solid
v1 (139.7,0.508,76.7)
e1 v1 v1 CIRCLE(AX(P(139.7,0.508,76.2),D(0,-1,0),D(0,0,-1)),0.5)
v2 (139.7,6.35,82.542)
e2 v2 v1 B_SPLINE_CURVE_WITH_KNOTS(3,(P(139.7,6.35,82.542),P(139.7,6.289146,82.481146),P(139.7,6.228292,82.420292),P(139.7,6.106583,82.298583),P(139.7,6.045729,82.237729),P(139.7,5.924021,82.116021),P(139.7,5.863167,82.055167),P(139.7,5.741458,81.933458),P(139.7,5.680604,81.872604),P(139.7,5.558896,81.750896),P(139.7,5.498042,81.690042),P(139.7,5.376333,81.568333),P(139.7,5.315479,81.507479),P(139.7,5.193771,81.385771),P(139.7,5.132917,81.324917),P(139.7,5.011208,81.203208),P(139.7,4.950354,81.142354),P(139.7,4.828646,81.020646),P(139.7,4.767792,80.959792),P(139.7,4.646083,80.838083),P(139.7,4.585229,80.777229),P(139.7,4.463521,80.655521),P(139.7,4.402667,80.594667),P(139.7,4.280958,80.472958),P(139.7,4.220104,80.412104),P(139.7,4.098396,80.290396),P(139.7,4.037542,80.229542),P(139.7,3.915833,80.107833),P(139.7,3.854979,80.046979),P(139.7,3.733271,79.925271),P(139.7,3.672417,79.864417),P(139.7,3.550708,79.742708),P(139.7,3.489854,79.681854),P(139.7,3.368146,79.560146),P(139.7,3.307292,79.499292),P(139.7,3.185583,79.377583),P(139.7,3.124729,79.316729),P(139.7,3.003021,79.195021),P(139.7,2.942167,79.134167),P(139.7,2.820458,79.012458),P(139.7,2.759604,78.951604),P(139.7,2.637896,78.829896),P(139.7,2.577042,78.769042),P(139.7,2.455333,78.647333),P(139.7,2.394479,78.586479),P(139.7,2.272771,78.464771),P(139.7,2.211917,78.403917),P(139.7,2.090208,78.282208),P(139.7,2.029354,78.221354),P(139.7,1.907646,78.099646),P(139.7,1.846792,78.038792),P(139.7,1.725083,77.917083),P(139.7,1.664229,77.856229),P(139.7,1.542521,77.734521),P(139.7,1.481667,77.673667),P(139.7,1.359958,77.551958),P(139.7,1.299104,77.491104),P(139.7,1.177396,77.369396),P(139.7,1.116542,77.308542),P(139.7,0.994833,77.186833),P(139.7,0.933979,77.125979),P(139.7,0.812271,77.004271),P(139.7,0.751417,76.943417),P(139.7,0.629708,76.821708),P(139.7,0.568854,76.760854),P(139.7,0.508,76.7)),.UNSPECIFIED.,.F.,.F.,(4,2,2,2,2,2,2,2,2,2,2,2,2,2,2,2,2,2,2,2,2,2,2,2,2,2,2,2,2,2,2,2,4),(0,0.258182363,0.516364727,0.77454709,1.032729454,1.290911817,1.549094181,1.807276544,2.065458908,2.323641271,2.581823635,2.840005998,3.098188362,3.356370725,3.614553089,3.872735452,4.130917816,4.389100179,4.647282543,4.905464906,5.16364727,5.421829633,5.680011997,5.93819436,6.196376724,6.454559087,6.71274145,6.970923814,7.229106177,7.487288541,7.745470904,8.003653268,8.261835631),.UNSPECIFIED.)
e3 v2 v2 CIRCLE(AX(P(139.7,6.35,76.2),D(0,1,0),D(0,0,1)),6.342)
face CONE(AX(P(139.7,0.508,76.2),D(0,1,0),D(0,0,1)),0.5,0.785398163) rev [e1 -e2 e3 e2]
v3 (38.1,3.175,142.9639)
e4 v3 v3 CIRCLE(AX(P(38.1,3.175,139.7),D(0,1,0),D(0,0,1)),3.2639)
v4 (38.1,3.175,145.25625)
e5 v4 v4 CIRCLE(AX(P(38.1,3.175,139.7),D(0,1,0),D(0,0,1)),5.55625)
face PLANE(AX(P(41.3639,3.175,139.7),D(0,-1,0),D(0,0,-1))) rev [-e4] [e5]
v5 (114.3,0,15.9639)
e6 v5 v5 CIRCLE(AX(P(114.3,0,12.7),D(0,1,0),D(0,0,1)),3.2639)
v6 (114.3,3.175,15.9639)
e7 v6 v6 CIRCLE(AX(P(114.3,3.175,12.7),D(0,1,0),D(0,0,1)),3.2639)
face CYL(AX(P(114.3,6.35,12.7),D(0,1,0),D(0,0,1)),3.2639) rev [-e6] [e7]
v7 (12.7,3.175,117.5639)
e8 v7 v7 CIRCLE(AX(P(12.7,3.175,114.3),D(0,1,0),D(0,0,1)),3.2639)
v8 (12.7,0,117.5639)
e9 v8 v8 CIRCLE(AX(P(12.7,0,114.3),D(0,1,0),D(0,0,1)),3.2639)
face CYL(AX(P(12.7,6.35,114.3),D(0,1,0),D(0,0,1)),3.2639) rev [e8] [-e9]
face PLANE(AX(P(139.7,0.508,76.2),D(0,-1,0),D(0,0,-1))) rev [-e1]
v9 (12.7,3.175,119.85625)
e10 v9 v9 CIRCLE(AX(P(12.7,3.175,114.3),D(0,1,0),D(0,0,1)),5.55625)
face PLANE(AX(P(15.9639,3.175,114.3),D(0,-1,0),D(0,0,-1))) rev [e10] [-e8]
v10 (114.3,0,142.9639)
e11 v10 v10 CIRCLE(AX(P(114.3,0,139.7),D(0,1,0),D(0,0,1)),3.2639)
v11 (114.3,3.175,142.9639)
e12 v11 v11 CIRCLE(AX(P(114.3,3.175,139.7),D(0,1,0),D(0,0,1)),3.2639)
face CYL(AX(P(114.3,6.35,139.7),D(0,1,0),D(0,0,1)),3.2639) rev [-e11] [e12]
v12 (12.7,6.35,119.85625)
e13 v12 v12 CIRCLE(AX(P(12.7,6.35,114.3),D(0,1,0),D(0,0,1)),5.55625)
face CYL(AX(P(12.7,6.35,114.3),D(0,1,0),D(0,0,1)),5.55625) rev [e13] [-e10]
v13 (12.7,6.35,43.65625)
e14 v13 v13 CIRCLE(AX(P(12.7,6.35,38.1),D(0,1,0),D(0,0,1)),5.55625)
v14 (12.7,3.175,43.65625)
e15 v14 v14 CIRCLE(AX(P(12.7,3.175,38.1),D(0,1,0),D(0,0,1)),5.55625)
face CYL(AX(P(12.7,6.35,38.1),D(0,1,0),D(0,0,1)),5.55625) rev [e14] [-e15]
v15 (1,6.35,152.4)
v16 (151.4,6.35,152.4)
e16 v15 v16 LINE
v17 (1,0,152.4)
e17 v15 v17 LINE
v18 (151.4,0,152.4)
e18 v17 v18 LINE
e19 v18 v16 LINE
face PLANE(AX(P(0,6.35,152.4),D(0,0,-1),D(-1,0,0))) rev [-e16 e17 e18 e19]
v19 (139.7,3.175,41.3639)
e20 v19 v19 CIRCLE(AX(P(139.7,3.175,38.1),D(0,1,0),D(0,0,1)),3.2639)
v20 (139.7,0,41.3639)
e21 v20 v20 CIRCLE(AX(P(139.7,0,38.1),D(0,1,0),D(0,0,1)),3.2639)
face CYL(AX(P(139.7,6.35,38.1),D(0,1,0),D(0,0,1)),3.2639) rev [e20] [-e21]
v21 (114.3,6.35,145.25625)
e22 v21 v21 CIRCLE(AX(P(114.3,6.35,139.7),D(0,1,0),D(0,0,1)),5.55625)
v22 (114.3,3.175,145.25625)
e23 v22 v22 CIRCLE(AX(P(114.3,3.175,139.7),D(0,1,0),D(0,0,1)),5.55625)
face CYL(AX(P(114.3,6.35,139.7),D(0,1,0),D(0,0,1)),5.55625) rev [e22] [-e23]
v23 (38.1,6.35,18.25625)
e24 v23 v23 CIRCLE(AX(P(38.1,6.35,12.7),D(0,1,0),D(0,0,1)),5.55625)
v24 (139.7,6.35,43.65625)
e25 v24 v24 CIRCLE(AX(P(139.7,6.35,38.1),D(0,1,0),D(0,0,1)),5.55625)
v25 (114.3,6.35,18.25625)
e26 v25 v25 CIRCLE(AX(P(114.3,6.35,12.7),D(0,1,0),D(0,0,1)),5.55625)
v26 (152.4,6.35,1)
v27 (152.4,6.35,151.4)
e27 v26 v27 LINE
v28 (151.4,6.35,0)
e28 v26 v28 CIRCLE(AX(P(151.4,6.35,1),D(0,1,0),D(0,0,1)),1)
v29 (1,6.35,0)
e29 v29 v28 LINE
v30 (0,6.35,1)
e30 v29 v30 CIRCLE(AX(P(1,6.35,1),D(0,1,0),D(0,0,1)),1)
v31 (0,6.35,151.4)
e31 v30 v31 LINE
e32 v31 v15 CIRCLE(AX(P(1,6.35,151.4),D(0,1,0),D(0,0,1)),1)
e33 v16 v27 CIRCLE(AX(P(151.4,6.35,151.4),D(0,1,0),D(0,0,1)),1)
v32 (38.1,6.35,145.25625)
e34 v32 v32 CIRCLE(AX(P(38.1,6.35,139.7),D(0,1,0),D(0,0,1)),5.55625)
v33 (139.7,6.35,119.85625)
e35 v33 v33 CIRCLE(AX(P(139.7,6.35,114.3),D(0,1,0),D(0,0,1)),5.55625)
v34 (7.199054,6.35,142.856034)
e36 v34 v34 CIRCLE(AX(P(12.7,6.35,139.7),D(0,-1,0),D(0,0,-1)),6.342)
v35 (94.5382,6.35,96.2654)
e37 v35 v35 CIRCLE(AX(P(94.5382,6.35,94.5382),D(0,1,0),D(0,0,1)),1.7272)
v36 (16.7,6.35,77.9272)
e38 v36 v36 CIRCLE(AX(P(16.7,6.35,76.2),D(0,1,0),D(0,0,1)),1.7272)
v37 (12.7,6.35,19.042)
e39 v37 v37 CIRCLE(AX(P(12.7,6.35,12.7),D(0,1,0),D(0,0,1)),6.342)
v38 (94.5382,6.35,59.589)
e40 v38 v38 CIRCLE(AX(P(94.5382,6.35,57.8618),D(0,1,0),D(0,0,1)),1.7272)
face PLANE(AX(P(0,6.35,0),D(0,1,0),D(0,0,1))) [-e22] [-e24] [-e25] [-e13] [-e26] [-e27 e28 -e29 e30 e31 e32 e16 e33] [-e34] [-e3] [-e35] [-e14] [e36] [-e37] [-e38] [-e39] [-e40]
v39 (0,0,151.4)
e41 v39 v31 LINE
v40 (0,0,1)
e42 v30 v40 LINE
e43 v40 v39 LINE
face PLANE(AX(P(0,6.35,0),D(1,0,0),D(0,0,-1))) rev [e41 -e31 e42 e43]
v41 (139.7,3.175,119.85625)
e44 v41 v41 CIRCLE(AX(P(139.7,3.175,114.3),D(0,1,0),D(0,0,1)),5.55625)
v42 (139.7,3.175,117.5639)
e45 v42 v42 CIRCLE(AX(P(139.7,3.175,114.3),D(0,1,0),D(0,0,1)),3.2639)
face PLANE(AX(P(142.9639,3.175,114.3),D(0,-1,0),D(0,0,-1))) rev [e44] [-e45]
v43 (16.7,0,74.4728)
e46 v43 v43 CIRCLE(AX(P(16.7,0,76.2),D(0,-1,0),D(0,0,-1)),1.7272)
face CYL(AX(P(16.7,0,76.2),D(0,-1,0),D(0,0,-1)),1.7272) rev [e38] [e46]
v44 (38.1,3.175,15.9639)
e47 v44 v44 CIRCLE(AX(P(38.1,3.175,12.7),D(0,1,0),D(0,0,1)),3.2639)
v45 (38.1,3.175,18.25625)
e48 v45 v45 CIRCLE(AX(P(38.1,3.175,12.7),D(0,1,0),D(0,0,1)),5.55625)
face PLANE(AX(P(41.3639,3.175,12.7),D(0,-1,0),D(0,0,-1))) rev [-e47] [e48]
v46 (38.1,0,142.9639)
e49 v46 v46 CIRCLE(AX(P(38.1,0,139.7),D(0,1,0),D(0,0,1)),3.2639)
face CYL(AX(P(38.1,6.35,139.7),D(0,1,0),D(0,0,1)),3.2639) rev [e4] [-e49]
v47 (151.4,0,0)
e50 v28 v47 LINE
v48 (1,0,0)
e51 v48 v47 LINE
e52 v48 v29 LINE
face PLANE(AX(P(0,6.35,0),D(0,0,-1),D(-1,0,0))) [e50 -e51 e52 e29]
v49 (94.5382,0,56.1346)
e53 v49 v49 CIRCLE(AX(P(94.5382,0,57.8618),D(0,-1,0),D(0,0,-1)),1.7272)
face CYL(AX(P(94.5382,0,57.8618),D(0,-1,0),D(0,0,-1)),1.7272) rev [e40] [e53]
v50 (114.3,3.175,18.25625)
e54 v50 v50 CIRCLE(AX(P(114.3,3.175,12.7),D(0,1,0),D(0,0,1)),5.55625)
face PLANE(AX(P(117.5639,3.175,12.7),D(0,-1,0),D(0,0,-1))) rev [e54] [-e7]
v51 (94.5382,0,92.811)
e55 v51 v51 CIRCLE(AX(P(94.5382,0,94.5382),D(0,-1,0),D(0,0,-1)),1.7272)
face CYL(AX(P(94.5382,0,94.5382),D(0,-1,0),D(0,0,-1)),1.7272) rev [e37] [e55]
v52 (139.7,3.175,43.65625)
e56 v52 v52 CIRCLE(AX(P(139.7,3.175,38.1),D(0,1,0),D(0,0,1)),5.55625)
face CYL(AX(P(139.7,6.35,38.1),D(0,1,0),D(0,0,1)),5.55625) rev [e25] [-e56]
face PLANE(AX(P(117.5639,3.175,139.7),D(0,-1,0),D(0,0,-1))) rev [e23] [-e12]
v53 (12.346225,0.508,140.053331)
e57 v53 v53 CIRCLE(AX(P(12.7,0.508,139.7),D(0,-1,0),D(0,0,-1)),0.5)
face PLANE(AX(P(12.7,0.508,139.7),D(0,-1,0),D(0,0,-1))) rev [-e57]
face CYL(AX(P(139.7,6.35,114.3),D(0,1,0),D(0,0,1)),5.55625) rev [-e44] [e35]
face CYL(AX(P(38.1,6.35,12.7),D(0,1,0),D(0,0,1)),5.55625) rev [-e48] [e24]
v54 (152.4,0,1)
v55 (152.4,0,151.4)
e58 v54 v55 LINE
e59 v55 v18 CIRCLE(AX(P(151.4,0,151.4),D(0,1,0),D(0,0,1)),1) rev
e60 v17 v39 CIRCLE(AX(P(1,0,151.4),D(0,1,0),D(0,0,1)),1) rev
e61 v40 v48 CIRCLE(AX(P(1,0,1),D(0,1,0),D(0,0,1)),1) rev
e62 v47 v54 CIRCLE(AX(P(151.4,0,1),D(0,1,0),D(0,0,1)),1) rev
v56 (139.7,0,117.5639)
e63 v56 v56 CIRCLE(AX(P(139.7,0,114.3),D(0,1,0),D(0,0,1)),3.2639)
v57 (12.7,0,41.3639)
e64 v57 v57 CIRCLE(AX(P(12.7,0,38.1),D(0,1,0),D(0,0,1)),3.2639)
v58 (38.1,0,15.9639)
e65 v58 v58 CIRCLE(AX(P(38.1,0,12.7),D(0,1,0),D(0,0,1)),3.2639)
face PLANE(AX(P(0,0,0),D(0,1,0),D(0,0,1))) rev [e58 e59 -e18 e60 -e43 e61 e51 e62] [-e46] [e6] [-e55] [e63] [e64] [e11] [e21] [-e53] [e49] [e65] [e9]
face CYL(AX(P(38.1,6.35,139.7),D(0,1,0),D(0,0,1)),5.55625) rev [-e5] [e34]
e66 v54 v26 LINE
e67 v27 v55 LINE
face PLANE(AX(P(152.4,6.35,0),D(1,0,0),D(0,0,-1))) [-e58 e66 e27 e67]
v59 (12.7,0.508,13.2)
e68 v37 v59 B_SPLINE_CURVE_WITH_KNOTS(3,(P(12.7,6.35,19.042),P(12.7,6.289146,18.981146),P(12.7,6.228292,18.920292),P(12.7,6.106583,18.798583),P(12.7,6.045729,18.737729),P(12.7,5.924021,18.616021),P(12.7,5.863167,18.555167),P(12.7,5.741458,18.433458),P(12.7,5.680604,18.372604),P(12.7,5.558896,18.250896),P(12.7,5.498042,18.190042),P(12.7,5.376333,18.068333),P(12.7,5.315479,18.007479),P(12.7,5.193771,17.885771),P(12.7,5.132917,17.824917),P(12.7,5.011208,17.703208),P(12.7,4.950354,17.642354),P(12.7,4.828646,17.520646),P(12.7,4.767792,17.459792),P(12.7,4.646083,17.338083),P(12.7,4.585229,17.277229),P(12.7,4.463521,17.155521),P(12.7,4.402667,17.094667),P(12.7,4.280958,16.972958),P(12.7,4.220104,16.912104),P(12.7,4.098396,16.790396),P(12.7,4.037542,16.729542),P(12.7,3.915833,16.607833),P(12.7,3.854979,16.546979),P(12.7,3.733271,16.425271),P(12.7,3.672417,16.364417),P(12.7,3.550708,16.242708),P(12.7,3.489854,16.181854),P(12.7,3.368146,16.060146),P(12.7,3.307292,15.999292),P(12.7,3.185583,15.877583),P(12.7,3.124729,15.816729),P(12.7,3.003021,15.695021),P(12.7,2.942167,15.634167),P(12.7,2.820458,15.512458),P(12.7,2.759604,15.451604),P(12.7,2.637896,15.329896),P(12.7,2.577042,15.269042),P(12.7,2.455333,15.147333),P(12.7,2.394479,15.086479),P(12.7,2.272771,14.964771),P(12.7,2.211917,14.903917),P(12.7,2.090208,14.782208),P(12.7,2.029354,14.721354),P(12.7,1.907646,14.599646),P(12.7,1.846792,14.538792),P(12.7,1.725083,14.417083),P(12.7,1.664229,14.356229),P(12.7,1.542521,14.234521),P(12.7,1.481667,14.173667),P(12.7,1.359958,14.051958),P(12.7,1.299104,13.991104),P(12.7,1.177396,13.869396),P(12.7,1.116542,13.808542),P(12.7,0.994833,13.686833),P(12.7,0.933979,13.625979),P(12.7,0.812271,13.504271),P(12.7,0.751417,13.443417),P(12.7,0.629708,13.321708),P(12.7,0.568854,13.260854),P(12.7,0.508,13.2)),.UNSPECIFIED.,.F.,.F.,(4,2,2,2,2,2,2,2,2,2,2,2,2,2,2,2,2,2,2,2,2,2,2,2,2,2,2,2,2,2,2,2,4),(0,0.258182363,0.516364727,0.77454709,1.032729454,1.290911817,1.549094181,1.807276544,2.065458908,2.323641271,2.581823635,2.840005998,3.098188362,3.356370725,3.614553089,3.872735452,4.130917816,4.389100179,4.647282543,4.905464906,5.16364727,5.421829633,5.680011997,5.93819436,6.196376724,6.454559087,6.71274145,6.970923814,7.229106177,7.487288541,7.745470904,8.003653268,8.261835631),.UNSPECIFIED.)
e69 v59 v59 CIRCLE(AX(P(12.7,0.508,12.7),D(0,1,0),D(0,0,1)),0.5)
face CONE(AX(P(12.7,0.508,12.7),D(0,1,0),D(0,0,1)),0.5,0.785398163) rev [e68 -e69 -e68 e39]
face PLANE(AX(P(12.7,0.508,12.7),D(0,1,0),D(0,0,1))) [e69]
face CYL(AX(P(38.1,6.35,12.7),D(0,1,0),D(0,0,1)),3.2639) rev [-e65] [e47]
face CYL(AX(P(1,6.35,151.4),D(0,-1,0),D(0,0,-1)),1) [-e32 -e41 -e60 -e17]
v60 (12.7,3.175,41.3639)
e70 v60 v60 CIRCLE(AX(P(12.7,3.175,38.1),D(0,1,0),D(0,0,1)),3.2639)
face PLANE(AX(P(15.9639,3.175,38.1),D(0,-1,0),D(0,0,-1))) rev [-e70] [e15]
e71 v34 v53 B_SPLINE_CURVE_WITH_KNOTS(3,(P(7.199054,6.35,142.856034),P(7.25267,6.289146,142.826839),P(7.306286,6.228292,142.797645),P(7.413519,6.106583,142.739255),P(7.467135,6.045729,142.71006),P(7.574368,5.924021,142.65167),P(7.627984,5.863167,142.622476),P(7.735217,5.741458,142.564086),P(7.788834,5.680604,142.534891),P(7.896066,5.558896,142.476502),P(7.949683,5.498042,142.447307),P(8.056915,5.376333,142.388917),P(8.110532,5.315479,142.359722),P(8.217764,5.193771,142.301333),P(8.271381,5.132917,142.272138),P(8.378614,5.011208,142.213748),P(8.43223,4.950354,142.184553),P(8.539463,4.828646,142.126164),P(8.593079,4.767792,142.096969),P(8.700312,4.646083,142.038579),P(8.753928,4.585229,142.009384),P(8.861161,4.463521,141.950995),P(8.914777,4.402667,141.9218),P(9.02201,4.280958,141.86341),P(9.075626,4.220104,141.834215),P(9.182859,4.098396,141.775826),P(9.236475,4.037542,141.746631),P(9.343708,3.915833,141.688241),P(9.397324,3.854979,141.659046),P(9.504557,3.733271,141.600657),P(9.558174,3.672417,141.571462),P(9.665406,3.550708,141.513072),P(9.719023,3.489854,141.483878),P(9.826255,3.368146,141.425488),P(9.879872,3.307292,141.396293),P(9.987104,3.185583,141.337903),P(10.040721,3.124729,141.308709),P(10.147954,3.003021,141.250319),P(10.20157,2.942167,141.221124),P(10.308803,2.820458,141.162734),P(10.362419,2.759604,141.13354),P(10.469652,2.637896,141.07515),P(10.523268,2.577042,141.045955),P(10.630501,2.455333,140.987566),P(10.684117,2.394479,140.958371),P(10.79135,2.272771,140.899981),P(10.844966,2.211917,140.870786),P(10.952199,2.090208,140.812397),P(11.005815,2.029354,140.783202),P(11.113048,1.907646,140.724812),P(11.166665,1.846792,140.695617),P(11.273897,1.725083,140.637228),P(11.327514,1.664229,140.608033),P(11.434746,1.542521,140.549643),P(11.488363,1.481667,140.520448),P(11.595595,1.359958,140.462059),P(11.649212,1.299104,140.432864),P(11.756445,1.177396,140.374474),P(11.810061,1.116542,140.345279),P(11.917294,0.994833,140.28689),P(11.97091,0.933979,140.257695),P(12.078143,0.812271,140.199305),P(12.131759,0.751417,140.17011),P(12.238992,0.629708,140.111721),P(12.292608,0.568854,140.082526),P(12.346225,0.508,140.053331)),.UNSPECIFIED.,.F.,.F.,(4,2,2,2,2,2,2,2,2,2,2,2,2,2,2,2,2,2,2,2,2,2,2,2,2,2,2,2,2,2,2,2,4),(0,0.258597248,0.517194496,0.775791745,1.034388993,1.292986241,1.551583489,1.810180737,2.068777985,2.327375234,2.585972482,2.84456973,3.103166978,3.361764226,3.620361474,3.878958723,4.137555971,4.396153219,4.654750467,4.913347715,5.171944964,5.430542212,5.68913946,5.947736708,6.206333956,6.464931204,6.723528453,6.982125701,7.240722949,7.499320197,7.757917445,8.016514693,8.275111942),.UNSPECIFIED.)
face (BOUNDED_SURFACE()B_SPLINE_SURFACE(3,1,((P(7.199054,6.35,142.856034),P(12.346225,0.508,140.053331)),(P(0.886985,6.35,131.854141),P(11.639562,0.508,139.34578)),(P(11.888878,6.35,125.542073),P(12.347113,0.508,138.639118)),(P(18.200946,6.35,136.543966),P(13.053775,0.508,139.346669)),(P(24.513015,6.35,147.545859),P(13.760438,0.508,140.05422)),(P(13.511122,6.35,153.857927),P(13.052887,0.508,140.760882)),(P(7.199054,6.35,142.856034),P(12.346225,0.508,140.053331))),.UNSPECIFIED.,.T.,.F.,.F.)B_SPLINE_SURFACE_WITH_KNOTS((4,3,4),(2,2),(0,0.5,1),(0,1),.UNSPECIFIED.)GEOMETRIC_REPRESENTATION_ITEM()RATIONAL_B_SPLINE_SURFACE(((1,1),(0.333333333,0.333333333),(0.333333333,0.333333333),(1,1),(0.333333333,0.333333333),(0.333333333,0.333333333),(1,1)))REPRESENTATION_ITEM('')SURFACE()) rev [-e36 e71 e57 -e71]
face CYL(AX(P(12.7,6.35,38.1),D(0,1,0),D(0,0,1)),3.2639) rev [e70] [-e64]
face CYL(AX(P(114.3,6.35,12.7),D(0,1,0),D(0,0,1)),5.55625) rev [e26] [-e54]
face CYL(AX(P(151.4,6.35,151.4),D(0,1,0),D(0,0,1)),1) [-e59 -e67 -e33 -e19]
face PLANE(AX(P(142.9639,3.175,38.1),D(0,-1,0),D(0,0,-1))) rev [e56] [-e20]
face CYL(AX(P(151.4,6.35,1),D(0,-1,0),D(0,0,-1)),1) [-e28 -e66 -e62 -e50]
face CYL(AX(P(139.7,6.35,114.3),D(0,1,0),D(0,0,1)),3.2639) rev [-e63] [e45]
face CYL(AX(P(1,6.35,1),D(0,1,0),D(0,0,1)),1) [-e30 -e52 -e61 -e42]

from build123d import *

# Parameters (mm, degrees)
SKETCH1_W                                        = 152.4
SKETCH1_H                                        = 152.4
SKETCH1_R                                        = 3.2639
BOSS_EXTRUDE1_DEPTH                              = 6.35
SKETCH3_R                                        = 6.342
SKETCH4_R                                        = 0.5
SKETCH7_R                                        = 6.342
SKETCH8_R                                        = 0.5
F_8_32_TAPPED_HOLE1_D                            = 3.4544
CBORE_FOR_1_4_SOCKET_HEAD_CAP_SCREW1_D           = 6.5278
CBORE_FOR_1_4_SOCKET_HEAD_CAP_SCREW1_CBORE_D     = 11.1125
CBORE_FOR_1_4_SOCKET_HEAD_CAP_SCREW1_CBORE_DEPTH = 3.175
FILLET1_R                                        = 1


with BuildPart() as part:
    # Sketch1 → Boss-Extrude1 (new body)
    # profile 1 of 13: a face of its own
    with BuildSketch(Plane(origin=(0, 0, 0), x_dir=(1, 0, 0), z_dir=(0, 1, 0))):
        with Locations((76.2, -76.2)):
            Rectangle(SKETCH1_W, SKETCH1_H)
        with Locations((12.7, -38.1)):
            Circle(SKETCH1_R, mode=Mode.SUBTRACT)
        with Locations((12.7, -114.3)):
            Circle(SKETCH1_R, mode=Mode.SUBTRACT)
        with Locations((38.1, -139.7)):
            Circle(SKETCH1_R, mode=Mode.SUBTRACT)
        with Locations((114.3, -139.7)):
            Circle(SKETCH1_R, mode=Mode.SUBTRACT)
        with Locations((139.7, -114.3)):
            Circle(SKETCH1_R, mode=Mode.SUBTRACT)
        with Locations((139.7, -38.1)):
            Circle(SKETCH1_R, mode=Mode.SUBTRACT)
        with Locations((114.3, -12.7)):
            Circle(SKETCH1_R, mode=Mode.SUBTRACT)
        with Locations((38.1, -12.7)):
            Circle(SKETCH1_R, mode=Mode.SUBTRACT)
        with Locations((12.7, -139.7)):
            Circle(SKETCH1_R, mode=Mode.SUBTRACT)
        with Locations((139.7, -139.7)):
            Circle(SKETCH1_R, mode=Mode.SUBTRACT)
        with Locations((139.7, -12.7)):
            Circle(SKETCH1_R, mode=Mode.SUBTRACT)
        with Locations((12.7, -12.7)):
            Circle(SKETCH1_R, mode=Mode.SUBTRACT)
    # profile 2 of 13: a face of its own
    with BuildSketch(Plane(origin=(0, 0, 0), x_dir=(1, 0, 0), z_dir=(0, 1, 0))):
        with Locations((12.7, -12.7)):
            Circle(SKETCH1_R)
    # profile 3 of 13: a face of its own
    with BuildSketch(Plane(origin=(0, 0, 0), x_dir=(1, 0, 0), z_dir=(0, 1, 0))):
        with Locations((139.7, -12.7)):
            Circle(SKETCH1_R)
    # profile 4 of 13: a face of its own
    with BuildSketch(Plane(origin=(0, 0, 0), x_dir=(1, 0, 0), z_dir=(0, 1, 0))):
        with Locations((139.7, -139.7)):
            Circle(SKETCH1_R)
    # profile 5 of 13: a face of its own
    with BuildSketch(Plane(origin=(0, 0, 0), x_dir=(1, 0, 0), z_dir=(0, 1, 0))):
        with Locations((12.7, -139.7)):
            Circle(SKETCH1_R)
    # profile 6 of 13: a face of its own
    with BuildSketch(Plane(origin=(0, 0, 0), x_dir=(1, 0, 0), z_dir=(0, 1, 0))):
        with Locations((38.1, -12.7)):
            Circle(SKETCH1_R)
    # profile 7 of 13: a face of its own
    with BuildSketch(Plane(origin=(0, 0, 0), x_dir=(1, 0, 0), z_dir=(0, 1, 0))):
        with Locations((12.7, -38.1)):
            Circle(SKETCH1_R)
    # profile 8 of 13: a face of its own
    with BuildSketch(Plane(origin=(0, 0, 0), x_dir=(1, 0, 0), z_dir=(0, 1, 0))):
        with Locations((139.7, -38.1)):
            Circle(SKETCH1_R)
    # profile 9 of 13: a face of its own
    with BuildSketch(Plane(origin=(0, 0, 0), x_dir=(1, 0, 0), z_dir=(0, 1, 0))):
        with Locations((114.3, -12.7)):
            Circle(SKETCH1_R)
    # profile 10 of 13: a face of its own
    with BuildSketch(Plane(origin=(0, 0, 0), x_dir=(1, 0, 0), z_dir=(0, 1, 0))):
        with Locations((139.7, -114.3)):
            Circle(SKETCH1_R)
    # profile 11 of 13: a face of its own
    with BuildSketch(Plane(origin=(0, 0, 0), x_dir=(1, 0, 0), z_dir=(0, 1, 0))):
        with Locations((114.3, -139.7)):
            Circle(SKETCH1_R)
    # profile 12 of 13: a face of its own
    with BuildSketch(Plane(origin=(0, 0, 0), x_dir=(1, 0, 0), z_dir=(0, 1, 0))):
        with Locations((12.7, -114.3)):
            Circle(SKETCH1_R)
    # profile 13 of 13: a face of its own
    with BuildSketch(Plane(origin=(0, 0, 0), x_dir=(1, 0, 0), z_dir=(0, 1, 0))):
        with Locations((38.1, -139.7)):
            Circle(SKETCH1_R)
    extrude(amount=BOSS_EXTRUDE1_DEPTH)

    # Sketch3 → Cut-Loft1 section 0
    with BuildSketch(Plane(origin=(0, 6.35, 0), x_dir=(1, 0, 0), z_dir=(0, 1, 0))):
        with Locations((12.7, -12.7)):
            Circle(SKETCH3_R)
    # Sketch4 → Cut-Loft1 section 1
    with BuildSketch(Plane(origin=(0, 0.508, 0), x_dir=(1, 0, 0), z_dir=(0, 1, 0))):
        with Locations((12.7, -12.7)):
            Circle(SKETCH4_R)
    loft(mode=Mode.SUBTRACT)

    # Cut-Loft2: read off the stored shape, not the designer's step
    # Cut-Loft2: loft between two sections, ruled curve by curve
    cut_loft2_from = [
        Edge.make_bspline([(7.199053533, 6.35, 142.856034215), (0.886985103, 6.35, 131.85414128), (11.888878038, 6.35, 125.542072851), (18.200946467, 6.35, 136.543965785), (24.513014897, 6.35, 147.54585872), (13.511121962, 6.35, 153.857927149), (7.199053533, 6.35, 142.856034215)], [0, 0, 0, 0, 0.5, 0.5, 0.5, 1, 1, 1, 1], 3, [1, 0.333333333, 0.333333333, 1, 0.333333333, 0.333333333, 1]),
    ]
    cut_loft2_to = [
        Edge.make_bspline([(12.346224535, 0.508, 140.053331177), (11.639562182, 0.508, 139.345780247), (12.347113112, 0.508, 138.639117893), (13.053775465, 0.508, 139.346668823), (13.760437818, 0.508, 140.054219753), (13.052886888, 0.508, 140.760882107), (12.346224535, 0.508, 140.053331177)], [0, 0, 0, 0, 0.5, 0.5, 0.5, 1, 1, 1, 1], 3, [1, 0.333333333, 0.333333333, 1, 0.333333333, 0.333333333, 1]),
    ]
    cut_loft2 = Solid(Shell([*[Face.make_surface_from_curves(cut_loft2_from[k], cut_loft2_to[k]) for k in range(1)], Face(Wire(cut_loft2_from)), Face(Wire(cut_loft2_to))]))
    add(cut_loft2, mode=Mode.SUBTRACT)

    # Sketch7 → Cut-Loft4 section 0
    with BuildSketch(Plane(origin=(0, 6.35, 0), x_dir=(1, 0, 0), z_dir=(0, 1, 0))):
        with Locations((139.7, -76.2)):
            Circle(SKETCH7_R)
    # Sketch8 → Cut-Loft4 section 1
    with BuildSketch(Plane(origin=(0, 0.508, -1.35), x_dir=(1, 0, 0), z_dir=(0, -1, 0))):
        with Locations((139.7, 77.55)):
            Circle(SKETCH8_R)
    loft(mode=Mode.SUBTRACT)

    # #8-32 Tapped Hole1 (through all)
    with Locations(Plane(origin=(16.7, 0, 76.2), x_dir=(0, 0, -1), z_dir=(0, -1, 0))):
        with Locations((0, 0), (18.3382, 77.8382), (-18.3382, 77.8382)):
            Hole(F_8_32_TAPPED_HOLE1_D / 2)

    # CBORE for 1/4 Socket Head Cap Screw1 (through all)
    with Locations(Plane(origin=(38.1, 6.35, 12.7), x_dir=(0, 0, 1), z_dir=(0, 1, 0))):
        with Locations((0, 0), (25.4, -25.4), (0, 76.2), (25.4, 101.6), (101.6, 101.6), (127, 76.2), (127, 0), (101.6, -25.4)):
            CounterBoreHole(CBORE_FOR_1_4_SOCKET_HEAD_CAP_SCREW1_D / 2, CBORE_FOR_1_4_SOCKET_HEAD_CAP_SCREW1_CBORE_D / 2, CBORE_FOR_1_4_SOCKET_HEAD_CAP_SCREW1_CBORE_DEPTH)

    # Fillet1
    fillet1_edges = [part.edges().sort_by_distance(p)[0] for p in [
        (152.4, 3.175, 152.4),
        (0, 3.175, 152.4),
        (0, 3.175, 0),
        (152.4, 3.175, 0),
    ]]
    fillet(fillet1_edges, radius=FILLET1_R)


solid = part.part
